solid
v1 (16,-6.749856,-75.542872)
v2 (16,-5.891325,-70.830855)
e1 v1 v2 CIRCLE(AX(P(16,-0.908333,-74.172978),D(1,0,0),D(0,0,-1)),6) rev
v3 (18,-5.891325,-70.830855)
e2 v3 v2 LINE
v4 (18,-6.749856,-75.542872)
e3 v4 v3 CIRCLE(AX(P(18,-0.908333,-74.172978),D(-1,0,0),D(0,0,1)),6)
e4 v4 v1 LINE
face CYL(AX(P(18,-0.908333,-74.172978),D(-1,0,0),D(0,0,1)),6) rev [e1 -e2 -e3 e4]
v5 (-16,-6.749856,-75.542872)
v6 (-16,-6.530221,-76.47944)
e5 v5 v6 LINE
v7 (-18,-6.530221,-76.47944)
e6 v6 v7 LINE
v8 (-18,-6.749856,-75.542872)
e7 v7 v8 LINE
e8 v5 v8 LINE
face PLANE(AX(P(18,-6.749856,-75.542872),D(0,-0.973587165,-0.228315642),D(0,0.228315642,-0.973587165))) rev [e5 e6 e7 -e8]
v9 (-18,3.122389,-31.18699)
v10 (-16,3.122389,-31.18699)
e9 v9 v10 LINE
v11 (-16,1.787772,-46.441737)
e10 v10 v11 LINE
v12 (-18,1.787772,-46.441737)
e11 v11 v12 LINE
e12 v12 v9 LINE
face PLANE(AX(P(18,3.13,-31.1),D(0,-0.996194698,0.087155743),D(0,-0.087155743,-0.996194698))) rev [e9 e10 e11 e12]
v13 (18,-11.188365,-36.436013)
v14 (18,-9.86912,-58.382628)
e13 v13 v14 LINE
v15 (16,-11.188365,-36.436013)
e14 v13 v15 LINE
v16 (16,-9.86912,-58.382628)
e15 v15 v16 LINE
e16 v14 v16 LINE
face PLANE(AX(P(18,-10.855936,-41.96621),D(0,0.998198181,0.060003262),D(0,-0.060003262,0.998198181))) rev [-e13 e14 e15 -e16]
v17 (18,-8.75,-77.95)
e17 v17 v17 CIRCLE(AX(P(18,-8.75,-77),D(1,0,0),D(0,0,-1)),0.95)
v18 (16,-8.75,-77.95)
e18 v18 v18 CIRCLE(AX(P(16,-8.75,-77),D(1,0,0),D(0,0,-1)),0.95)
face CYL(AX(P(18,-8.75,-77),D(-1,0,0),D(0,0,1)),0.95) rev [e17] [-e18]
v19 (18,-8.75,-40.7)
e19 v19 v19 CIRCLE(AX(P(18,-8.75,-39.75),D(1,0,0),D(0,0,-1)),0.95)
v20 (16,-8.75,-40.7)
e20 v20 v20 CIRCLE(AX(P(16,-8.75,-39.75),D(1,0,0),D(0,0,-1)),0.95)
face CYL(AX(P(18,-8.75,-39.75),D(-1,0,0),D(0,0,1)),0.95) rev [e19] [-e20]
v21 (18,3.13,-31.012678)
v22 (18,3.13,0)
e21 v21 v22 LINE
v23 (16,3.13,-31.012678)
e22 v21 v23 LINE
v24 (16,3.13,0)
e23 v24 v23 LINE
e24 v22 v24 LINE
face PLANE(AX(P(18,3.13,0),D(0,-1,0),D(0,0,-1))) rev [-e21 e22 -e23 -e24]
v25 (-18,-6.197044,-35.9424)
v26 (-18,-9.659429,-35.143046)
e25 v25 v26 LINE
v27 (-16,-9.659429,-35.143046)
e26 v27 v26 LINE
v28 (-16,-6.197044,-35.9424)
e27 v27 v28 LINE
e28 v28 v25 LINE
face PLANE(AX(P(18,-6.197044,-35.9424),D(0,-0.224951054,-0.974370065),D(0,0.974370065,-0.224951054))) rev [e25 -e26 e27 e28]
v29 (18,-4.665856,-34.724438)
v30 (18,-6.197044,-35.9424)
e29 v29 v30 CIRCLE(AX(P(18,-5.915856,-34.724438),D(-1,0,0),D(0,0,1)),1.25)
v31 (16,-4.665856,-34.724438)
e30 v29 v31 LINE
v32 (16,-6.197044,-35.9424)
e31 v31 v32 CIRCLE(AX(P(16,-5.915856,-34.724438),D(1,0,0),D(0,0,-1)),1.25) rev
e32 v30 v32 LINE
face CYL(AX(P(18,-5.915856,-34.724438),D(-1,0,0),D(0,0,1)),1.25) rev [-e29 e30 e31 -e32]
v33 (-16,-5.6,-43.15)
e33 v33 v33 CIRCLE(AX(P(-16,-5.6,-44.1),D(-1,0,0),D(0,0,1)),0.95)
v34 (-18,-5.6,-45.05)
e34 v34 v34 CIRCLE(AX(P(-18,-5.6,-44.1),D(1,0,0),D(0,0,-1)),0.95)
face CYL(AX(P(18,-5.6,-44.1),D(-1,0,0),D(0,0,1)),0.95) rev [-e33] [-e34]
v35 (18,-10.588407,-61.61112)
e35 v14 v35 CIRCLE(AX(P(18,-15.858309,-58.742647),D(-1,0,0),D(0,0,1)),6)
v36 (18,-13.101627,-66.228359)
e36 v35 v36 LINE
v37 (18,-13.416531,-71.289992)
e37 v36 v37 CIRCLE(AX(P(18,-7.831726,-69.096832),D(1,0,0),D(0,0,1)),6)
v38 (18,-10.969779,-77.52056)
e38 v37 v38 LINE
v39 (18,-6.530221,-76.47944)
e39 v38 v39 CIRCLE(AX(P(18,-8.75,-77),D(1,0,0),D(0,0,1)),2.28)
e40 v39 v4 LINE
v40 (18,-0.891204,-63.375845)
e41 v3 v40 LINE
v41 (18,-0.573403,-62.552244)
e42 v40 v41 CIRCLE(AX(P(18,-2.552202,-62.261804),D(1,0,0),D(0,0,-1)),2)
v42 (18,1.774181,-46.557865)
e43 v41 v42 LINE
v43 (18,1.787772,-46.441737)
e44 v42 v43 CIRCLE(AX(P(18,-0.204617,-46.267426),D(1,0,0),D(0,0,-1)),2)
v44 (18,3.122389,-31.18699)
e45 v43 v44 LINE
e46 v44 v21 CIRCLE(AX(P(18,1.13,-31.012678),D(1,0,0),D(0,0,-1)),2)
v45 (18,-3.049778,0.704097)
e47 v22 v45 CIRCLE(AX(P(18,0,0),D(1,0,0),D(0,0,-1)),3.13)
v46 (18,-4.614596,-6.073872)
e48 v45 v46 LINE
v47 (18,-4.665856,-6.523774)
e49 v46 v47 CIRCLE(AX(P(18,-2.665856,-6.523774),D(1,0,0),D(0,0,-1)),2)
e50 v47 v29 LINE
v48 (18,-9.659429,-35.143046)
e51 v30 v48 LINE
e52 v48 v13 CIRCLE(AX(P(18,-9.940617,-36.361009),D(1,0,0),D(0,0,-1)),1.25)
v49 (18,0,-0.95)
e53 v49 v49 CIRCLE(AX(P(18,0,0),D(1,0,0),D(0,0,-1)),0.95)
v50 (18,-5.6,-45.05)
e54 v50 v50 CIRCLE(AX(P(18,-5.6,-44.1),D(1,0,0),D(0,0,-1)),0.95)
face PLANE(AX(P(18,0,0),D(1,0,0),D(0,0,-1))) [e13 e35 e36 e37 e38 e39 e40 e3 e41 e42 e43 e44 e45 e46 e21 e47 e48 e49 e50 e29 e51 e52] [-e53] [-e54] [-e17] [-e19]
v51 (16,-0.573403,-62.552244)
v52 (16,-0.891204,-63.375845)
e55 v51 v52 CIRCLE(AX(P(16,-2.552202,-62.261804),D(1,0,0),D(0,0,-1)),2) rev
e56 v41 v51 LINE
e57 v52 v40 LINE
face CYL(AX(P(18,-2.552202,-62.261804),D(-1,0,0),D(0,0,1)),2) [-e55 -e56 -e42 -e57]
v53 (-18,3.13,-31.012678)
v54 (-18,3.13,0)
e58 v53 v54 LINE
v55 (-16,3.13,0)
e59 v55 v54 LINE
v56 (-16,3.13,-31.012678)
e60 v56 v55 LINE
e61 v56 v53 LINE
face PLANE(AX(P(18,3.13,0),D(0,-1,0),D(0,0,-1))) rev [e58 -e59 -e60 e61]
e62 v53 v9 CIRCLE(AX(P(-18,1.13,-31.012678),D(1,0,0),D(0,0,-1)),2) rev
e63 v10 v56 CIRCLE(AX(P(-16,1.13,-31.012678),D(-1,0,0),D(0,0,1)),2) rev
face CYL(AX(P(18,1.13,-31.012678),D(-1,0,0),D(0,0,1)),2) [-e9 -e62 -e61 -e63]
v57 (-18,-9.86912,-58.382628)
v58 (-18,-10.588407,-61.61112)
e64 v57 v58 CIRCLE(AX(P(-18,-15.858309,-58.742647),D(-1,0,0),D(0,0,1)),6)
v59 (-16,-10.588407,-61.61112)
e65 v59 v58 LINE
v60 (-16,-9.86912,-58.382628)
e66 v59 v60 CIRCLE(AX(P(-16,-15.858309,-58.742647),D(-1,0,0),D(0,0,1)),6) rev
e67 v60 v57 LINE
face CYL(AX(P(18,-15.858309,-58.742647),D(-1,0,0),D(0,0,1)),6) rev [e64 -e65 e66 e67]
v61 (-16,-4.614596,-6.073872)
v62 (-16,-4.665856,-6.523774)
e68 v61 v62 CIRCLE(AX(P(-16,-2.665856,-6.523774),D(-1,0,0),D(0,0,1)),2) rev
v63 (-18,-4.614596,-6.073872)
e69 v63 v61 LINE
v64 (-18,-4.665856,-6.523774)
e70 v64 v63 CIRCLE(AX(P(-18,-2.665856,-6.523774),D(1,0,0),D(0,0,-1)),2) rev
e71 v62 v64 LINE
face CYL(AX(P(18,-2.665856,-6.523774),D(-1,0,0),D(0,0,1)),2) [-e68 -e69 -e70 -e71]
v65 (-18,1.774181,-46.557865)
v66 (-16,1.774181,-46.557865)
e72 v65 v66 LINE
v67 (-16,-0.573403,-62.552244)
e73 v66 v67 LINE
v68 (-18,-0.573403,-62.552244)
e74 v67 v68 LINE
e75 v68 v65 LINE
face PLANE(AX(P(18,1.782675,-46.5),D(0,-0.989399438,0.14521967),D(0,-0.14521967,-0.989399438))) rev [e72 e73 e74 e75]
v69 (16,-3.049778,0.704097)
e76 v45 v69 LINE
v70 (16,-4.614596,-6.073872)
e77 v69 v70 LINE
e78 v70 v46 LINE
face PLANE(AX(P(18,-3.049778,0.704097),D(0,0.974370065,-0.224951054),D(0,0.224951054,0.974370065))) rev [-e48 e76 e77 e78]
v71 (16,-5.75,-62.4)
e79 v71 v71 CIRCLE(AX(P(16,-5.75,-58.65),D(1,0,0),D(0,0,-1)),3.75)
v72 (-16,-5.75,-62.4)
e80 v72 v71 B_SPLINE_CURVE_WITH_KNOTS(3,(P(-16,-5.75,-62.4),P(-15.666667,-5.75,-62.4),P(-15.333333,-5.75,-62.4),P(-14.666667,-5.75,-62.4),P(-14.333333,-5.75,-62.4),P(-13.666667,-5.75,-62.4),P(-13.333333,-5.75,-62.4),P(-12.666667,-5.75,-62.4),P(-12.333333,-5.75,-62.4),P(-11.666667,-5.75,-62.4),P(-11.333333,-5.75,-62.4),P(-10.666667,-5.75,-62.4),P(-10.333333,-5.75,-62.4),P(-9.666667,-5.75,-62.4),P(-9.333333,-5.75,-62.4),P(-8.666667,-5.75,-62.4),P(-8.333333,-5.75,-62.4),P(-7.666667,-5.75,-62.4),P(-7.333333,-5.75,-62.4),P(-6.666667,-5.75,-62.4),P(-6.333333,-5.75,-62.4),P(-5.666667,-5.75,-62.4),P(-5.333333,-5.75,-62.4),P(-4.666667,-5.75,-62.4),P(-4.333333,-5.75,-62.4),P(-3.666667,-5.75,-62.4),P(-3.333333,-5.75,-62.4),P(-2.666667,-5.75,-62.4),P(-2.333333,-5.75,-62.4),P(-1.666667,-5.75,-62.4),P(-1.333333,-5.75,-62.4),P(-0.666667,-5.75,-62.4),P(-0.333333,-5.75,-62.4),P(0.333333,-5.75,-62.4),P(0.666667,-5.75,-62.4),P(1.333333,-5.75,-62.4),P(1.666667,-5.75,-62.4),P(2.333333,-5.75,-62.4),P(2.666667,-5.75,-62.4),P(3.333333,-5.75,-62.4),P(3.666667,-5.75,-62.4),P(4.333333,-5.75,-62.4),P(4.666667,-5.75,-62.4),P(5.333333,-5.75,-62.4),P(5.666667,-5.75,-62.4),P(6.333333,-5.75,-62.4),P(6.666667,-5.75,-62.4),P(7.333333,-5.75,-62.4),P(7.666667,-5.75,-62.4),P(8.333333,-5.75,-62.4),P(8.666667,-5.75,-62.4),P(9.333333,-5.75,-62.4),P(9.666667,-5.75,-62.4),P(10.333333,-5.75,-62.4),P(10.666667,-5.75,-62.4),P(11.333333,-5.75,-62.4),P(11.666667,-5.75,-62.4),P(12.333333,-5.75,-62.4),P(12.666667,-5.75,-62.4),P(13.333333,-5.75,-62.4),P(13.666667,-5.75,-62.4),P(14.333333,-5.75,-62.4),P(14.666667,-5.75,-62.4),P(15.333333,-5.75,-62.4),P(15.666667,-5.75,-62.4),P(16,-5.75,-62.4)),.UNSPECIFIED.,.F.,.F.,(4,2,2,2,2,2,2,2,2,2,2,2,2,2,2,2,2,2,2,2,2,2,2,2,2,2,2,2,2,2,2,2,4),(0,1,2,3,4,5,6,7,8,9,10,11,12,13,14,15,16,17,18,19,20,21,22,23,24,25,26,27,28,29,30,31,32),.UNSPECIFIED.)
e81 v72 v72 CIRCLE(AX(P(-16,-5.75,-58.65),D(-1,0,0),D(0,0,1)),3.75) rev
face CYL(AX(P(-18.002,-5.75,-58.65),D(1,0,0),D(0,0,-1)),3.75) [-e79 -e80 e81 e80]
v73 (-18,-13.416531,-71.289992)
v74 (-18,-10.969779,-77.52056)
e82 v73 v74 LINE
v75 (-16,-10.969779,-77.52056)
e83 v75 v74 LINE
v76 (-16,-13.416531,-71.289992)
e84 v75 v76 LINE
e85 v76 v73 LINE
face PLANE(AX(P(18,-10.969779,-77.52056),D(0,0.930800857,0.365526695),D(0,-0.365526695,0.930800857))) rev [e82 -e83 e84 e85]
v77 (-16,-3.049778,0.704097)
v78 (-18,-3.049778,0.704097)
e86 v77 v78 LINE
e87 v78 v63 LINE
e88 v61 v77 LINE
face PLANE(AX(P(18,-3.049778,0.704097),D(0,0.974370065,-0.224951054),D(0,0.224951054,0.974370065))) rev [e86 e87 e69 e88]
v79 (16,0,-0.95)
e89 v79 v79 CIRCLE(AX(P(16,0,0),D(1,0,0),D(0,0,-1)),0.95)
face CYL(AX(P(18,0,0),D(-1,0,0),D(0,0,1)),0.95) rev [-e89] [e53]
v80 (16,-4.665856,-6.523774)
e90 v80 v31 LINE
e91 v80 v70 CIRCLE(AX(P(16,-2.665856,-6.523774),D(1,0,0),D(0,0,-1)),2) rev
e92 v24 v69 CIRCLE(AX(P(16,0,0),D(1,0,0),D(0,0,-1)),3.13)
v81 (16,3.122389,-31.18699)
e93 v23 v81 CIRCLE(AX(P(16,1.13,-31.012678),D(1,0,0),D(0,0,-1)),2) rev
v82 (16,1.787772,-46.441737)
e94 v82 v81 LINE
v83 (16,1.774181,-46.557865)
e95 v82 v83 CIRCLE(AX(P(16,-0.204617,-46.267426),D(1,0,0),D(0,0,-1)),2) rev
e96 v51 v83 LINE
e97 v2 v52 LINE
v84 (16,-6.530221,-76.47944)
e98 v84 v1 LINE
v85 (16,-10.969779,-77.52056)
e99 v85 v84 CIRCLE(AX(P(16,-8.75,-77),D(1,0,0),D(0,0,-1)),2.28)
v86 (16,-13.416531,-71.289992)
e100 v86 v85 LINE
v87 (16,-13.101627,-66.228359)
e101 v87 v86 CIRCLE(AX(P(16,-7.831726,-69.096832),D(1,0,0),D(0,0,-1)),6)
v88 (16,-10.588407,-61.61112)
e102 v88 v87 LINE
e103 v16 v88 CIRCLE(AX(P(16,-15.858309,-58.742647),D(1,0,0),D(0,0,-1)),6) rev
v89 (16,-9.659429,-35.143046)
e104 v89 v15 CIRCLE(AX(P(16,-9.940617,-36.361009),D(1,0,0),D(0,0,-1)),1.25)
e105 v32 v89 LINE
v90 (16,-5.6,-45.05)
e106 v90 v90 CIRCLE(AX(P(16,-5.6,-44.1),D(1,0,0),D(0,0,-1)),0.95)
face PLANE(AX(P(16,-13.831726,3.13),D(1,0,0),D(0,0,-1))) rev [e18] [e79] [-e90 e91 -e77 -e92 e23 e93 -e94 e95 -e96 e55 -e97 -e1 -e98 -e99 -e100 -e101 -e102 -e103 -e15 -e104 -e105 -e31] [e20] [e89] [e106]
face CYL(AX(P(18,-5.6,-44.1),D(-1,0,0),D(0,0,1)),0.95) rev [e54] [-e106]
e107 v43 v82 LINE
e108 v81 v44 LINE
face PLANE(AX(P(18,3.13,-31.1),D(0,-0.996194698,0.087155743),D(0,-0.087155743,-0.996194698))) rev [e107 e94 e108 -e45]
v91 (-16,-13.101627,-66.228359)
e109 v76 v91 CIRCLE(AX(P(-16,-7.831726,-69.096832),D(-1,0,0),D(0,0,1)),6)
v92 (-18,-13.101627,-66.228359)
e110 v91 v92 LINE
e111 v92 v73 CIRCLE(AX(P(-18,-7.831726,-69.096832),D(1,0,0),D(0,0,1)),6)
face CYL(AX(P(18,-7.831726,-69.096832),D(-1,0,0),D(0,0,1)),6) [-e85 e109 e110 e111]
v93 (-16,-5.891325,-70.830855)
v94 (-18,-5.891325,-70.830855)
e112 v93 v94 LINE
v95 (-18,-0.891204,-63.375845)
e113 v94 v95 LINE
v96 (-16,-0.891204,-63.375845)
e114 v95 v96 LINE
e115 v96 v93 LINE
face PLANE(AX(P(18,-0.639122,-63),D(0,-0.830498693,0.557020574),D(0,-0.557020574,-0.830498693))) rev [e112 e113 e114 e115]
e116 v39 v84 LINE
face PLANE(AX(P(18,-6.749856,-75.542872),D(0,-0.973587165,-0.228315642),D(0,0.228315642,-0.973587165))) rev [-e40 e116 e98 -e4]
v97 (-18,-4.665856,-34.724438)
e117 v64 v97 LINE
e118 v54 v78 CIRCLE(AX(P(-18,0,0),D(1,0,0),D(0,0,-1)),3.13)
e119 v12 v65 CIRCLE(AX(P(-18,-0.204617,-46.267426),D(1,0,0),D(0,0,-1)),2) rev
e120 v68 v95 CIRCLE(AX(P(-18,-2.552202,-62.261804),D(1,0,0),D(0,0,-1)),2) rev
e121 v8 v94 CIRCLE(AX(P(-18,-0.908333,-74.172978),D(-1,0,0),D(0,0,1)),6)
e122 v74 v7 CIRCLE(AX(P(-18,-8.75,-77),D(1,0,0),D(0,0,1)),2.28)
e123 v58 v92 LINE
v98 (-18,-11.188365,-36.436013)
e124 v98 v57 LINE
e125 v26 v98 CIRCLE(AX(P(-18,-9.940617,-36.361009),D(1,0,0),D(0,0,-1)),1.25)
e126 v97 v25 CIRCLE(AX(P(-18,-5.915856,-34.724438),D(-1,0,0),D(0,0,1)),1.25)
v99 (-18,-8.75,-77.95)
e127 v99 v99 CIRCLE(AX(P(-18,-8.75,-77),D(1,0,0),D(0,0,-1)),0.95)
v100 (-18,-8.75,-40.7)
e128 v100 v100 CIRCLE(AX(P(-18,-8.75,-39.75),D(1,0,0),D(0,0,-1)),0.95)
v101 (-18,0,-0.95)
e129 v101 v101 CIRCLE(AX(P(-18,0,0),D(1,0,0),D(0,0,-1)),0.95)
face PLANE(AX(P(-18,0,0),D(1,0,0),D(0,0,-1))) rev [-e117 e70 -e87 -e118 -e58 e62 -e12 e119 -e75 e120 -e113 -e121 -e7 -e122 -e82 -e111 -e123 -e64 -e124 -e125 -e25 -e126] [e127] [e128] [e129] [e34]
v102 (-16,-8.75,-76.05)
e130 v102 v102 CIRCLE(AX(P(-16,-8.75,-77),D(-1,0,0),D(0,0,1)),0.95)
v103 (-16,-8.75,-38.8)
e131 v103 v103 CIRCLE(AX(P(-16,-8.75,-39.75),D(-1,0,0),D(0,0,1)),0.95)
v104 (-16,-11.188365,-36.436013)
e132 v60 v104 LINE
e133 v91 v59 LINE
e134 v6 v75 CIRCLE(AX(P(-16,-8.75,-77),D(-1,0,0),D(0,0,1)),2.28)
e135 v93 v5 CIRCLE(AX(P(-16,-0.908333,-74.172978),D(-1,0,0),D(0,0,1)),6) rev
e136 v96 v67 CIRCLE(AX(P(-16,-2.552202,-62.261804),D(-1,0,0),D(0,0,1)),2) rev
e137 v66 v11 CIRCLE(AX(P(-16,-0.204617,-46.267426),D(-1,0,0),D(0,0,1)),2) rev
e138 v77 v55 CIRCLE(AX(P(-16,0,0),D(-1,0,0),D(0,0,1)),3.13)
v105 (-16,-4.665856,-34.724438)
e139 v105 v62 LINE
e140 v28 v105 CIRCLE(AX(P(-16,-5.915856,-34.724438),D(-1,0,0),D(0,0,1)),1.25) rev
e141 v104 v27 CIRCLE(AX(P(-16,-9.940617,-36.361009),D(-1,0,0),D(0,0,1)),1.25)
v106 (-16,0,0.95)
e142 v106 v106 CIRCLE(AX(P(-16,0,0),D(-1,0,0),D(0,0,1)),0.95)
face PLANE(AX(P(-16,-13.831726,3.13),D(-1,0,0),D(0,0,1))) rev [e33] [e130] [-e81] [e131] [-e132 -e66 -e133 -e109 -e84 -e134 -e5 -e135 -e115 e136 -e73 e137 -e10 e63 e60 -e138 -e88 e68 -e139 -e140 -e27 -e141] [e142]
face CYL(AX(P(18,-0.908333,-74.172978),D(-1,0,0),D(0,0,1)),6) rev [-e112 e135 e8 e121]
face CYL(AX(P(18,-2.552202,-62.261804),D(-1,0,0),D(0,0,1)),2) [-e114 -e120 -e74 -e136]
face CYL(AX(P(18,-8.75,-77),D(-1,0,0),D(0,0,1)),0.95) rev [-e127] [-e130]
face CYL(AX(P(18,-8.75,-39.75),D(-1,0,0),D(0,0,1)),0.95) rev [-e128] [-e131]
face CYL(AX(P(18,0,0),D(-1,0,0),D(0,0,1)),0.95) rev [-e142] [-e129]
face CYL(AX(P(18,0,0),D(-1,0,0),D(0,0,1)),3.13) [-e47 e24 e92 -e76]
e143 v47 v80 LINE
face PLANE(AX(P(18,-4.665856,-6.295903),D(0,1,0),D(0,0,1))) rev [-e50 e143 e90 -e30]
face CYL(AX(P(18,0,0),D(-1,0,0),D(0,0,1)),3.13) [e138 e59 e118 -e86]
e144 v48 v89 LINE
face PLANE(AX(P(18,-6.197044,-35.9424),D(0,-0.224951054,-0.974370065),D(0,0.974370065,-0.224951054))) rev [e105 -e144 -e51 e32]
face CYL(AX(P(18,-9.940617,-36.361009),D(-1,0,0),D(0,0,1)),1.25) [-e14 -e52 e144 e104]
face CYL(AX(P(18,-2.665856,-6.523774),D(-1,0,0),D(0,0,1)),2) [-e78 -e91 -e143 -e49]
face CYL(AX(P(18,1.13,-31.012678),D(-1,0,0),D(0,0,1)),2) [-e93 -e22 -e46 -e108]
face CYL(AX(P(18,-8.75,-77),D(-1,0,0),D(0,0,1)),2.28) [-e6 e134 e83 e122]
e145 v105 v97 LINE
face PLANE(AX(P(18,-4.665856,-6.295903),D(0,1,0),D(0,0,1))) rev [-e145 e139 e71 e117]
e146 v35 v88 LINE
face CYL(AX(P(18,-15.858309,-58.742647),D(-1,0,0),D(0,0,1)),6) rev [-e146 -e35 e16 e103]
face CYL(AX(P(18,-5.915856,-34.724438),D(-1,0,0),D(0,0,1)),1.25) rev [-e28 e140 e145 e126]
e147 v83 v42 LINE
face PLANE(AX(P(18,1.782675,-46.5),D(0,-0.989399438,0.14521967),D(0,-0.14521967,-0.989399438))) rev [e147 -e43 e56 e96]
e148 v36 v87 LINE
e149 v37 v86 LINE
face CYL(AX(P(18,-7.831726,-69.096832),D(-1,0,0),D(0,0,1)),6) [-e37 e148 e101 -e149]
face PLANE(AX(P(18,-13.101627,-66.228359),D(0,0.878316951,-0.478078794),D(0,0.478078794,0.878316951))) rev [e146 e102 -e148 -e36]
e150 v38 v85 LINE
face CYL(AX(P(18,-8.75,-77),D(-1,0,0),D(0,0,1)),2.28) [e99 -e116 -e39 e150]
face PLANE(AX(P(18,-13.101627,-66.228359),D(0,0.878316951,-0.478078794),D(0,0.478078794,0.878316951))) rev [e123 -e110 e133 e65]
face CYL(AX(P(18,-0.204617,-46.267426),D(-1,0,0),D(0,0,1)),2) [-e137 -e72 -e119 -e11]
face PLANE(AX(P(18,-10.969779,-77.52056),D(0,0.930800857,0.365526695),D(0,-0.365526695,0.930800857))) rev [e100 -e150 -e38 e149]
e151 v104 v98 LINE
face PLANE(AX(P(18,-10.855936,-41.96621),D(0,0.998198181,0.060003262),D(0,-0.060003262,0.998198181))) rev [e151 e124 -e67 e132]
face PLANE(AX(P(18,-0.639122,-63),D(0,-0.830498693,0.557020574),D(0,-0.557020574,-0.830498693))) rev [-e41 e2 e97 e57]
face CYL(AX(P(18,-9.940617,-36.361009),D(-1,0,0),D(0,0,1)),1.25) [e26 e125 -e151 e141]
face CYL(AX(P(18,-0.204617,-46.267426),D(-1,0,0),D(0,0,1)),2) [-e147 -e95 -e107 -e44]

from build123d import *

# Parameters (mm, degrees)
SKETCH1_R                = 0.95
BOSS_EXTRUDE1_DEPTH      = 18
FILLET1_R                = 2
CUT_EXTRUDE1_DEPTH       = 83.46596287
CUT_EXTRUDE1_DEPTH_BACK  = 83.46596287
SKETCH2_W                = 32
SKETCH2_H                = 82.41
BOSS_EXTRUDE2_DEPTH      = 18
BOSS_EXTRUDE2_DEPTH_BACK = 16
SKETCH3_R                = 3.75


with BuildPart() as part:
    # Sketch1 → Boss-Extrude1 (new, symmetric)
    with BuildSketch(Plane(origin=(0, 0, 0), x_dir=(0, 0, -1), z_dir=(1, 0, 0))):
        with BuildLine():
            Line((0, 3.13), (31.1, 3.13))
            Line((31.1, 3.13), (46.5, 1.782674582))
            Line((46.5, 1.782674582), (63, -0.639122384))
            Line((63, -0.639122384), (70.830854785, -5.891324783))
            ThreePointArc((70.830854785, -5.891324783), (73.097482442, -6.811154728), (75.542872081, -6.749855612))
            Line((75.542872081, -6.749855612), (76.479440337, -6.530221264))
            ThreePointArc((76.479440337, -6.530221264), (79.219778736, -8.229440337), (77.520559663, -10.969778736))
            Line((77.520559663, -10.969778736), (71.28999194, -13.416530703))
            ThreePointArc((71.28999194, -13.416530703), (68.724269269, -13.820147489), (66.228359009, -13.10162727))
            Line((66.228359009, -13.10162727), (61.611119998, -10.588406897))
            ThreePointArc((61.611119998, -10.588406897), (60.047418456, -10.001895705), (58.382627665, -9.86911952))
            Line((58.382627665, -9.86911952), (41.966210219, -10.855936181))
            Line((41.966210219, -10.855936181), (36.436012725, -11.188365046))
            ThreePointArc((36.436012725, -11.188365046), (35.406545304, -10.747772649), (35.143046066, -9.659428502))
            Line((35.143046066, -9.659428502), (35.942400407, -6.197044459))
            ThreePointArc((35.942400407, -6.197044459), (35.702698022, -5.137712345), (34.724437826, -4.665855641))
            Line((34.724437826, -4.665855641), (6.2959032, -4.665855641))
            Line((6.2959032, -4.665855641), (-0.7040968, -3.049778303))
            ThreePointArc((-0.7040968, -3.049778303), (-3.109879908, 0.354326059), (0, 3.13))
        make_face()
        Circle(SKETCH1_R, mode=Mode.SUBTRACT)
        with Locations((77, -8.75)):
            Circle(SKETCH1_R, mode=Mode.SUBTRACT)
        with Locations((44.1, -5.6)):
            Circle(SKETCH1_R, mode=Mode.SUBTRACT)
        with Locations((39.75, -8.75)):
            Circle(SKETCH1_R, mode=Mode.SUBTRACT)
    extrude(amount=BOSS_EXTRUDE1_DEPTH, both=True)

    # Fillet1
    # the kernel refuses this fillet: 2 mm, written as the material it takes off along each edge
    with BuildSketch(Plane(origin=(18.218304715, 3.13, -31.1), x_dir=(0, -0.08715574274766148, -0.9961946980917452), z_dir=(-1, 0, 0))) as fillet1_piece_1:
        with BuildLine():
            CenterArc((FILLET1_R * 0.0436609429085, FILLET1_R), FILLET1_R, 265, 5)
            Line((-FILLET1_R * 0.0434947998391, FILLET1_R * 0.00380530190825), (0, 0))
            Line((0, 0), (FILLET1_R * 0.0436609429085, 0))
        make_face()
    extrude(amount=36.436609429, mode=Mode.SUBTRACT)
    with BuildSketch(Plane(origin=(18.14621298, 1.782674582, -46.5), x_dir=(0, -0.14521967007723557, -0.9893994377513355), z_dir=(-1, 0, 0))) as fillet1_piece_2:
        with BuildLine():
            CenterArc((FILLET1_R * 0.0292425960983, FILLET1_R), FILLET1_R, 266.65, 3.35)
            Line((-FILLET1_R * 0.02919262642, FILLET1_R * 0.00170879761001), (0, 0))
            Line((0, 0), (FILLET1_R * 0.0292425960983, 0))
        make_face()
    extrude(amount=36.292425961, mode=Mode.SUBTRACT)
    with BuildSketch(Plane(origin=(19.131384491, -0.639122384, -63), x_dir=(0, -0.5570205743376995, -0.8304986934152874), z_dir=(-1, 0, 0))) as fillet1_piece_3:
        with BuildLine():
            CenterArc((FILLET1_R * 0.226276898255, FILLET1_R), FILLET1_R, 244.5, 25.5)
            Line((-FILLET1_R * 0.204234198553, FILLET1_R * 0.0974147156501), (0, 0))
            Line((0, 0), (FILLET1_R * 0.226276898255, 0))
        make_face()
    extrude(amount=38.262768983, mode=Mode.SUBTRACT)
    with BuildSketch(Plane(origin=(18.569678042, -4.665855641, -6.2959032), x_dir=(0, 0.22495105434386356, 0.9743700647852356), z_dir=(-1, 0, 0))) as fillet1_piece_4:
        with BuildLine():
            CenterArc((FILLET1_R * 0.113935608302, FILLET1_R), FILLET1_R, 257, 13)
            Line((-FILLET1_R * 0.111015446042, FILLET1_R * 0.0256299352148), (0, 0))
            Line((0, 0), (FILLET1_R * 0.113935608302, 0))
        make_face()
    extrude(amount=37.139356083, mode=Mode.SUBTRACT)

    # Sketch2 → Cut-Extrude1 (cut, two sides: drawn at the far end of the back side and taken through both)
    with BuildSketch(Plane(origin=(0, 0, 0), x_dir=(1, 0, 0), z_dir=(0, 1, 0)).offset(-CUT_EXTRUDE1_DEPTH_BACK)):
        with Locations((0, 38.075)):
            Rectangle(SKETCH2_W, SKETCH2_H)
    extrude(amount=CUT_EXTRUDE1_DEPTH + CUT_EXTRUDE1_DEPTH_BACK, mode=Mode.SUBTRACT)


with BuildPart() as cut_extrude1_piece_1:
    # of the separate pieces the step leaves, piece 1, a body of its own (cut_extrude1_pieces)
    add(part.part.solids().sort_by_distance((16, -13.416530703, -71.28999194))[0])



with BuildPart() as cut_extrude1_piece_2:
    # of the separate pieces the step leaves, piece 2, a body of its own (cut_extrude1_pieces)
    add(part.part.solids().sort_by_distance((-18, -13.416530703, -71.28999194))[0])


with BuildPart() as cut_extrude1_piece_1_1:
    add(cut_extrude1_piece_1.part)

    add(cut_extrude1_piece_2.part)  # Boss-Extrude2 merges Cut-Extrude1 piece 2
    # Sketch3 → Boss-Extrude2 (add, two sides: drawn at the far end of the back side and taken through both)
    with BuildSketch(Plane(origin=(0, 0, 0), x_dir=(0, 0, -1), z_dir=(1, 0, 0)).offset(-BOSS_EXTRUDE2_DEPTH_BACK)):
        with Locations((58.65, -5.75)):
            Circle(SKETCH3_R)
    extrude(amount=BOSS_EXTRUDE2_DEPTH + BOSS_EXTRUDE2_DEPTH_BACK)


solid = cut_extrude1_piece_1_1.part
